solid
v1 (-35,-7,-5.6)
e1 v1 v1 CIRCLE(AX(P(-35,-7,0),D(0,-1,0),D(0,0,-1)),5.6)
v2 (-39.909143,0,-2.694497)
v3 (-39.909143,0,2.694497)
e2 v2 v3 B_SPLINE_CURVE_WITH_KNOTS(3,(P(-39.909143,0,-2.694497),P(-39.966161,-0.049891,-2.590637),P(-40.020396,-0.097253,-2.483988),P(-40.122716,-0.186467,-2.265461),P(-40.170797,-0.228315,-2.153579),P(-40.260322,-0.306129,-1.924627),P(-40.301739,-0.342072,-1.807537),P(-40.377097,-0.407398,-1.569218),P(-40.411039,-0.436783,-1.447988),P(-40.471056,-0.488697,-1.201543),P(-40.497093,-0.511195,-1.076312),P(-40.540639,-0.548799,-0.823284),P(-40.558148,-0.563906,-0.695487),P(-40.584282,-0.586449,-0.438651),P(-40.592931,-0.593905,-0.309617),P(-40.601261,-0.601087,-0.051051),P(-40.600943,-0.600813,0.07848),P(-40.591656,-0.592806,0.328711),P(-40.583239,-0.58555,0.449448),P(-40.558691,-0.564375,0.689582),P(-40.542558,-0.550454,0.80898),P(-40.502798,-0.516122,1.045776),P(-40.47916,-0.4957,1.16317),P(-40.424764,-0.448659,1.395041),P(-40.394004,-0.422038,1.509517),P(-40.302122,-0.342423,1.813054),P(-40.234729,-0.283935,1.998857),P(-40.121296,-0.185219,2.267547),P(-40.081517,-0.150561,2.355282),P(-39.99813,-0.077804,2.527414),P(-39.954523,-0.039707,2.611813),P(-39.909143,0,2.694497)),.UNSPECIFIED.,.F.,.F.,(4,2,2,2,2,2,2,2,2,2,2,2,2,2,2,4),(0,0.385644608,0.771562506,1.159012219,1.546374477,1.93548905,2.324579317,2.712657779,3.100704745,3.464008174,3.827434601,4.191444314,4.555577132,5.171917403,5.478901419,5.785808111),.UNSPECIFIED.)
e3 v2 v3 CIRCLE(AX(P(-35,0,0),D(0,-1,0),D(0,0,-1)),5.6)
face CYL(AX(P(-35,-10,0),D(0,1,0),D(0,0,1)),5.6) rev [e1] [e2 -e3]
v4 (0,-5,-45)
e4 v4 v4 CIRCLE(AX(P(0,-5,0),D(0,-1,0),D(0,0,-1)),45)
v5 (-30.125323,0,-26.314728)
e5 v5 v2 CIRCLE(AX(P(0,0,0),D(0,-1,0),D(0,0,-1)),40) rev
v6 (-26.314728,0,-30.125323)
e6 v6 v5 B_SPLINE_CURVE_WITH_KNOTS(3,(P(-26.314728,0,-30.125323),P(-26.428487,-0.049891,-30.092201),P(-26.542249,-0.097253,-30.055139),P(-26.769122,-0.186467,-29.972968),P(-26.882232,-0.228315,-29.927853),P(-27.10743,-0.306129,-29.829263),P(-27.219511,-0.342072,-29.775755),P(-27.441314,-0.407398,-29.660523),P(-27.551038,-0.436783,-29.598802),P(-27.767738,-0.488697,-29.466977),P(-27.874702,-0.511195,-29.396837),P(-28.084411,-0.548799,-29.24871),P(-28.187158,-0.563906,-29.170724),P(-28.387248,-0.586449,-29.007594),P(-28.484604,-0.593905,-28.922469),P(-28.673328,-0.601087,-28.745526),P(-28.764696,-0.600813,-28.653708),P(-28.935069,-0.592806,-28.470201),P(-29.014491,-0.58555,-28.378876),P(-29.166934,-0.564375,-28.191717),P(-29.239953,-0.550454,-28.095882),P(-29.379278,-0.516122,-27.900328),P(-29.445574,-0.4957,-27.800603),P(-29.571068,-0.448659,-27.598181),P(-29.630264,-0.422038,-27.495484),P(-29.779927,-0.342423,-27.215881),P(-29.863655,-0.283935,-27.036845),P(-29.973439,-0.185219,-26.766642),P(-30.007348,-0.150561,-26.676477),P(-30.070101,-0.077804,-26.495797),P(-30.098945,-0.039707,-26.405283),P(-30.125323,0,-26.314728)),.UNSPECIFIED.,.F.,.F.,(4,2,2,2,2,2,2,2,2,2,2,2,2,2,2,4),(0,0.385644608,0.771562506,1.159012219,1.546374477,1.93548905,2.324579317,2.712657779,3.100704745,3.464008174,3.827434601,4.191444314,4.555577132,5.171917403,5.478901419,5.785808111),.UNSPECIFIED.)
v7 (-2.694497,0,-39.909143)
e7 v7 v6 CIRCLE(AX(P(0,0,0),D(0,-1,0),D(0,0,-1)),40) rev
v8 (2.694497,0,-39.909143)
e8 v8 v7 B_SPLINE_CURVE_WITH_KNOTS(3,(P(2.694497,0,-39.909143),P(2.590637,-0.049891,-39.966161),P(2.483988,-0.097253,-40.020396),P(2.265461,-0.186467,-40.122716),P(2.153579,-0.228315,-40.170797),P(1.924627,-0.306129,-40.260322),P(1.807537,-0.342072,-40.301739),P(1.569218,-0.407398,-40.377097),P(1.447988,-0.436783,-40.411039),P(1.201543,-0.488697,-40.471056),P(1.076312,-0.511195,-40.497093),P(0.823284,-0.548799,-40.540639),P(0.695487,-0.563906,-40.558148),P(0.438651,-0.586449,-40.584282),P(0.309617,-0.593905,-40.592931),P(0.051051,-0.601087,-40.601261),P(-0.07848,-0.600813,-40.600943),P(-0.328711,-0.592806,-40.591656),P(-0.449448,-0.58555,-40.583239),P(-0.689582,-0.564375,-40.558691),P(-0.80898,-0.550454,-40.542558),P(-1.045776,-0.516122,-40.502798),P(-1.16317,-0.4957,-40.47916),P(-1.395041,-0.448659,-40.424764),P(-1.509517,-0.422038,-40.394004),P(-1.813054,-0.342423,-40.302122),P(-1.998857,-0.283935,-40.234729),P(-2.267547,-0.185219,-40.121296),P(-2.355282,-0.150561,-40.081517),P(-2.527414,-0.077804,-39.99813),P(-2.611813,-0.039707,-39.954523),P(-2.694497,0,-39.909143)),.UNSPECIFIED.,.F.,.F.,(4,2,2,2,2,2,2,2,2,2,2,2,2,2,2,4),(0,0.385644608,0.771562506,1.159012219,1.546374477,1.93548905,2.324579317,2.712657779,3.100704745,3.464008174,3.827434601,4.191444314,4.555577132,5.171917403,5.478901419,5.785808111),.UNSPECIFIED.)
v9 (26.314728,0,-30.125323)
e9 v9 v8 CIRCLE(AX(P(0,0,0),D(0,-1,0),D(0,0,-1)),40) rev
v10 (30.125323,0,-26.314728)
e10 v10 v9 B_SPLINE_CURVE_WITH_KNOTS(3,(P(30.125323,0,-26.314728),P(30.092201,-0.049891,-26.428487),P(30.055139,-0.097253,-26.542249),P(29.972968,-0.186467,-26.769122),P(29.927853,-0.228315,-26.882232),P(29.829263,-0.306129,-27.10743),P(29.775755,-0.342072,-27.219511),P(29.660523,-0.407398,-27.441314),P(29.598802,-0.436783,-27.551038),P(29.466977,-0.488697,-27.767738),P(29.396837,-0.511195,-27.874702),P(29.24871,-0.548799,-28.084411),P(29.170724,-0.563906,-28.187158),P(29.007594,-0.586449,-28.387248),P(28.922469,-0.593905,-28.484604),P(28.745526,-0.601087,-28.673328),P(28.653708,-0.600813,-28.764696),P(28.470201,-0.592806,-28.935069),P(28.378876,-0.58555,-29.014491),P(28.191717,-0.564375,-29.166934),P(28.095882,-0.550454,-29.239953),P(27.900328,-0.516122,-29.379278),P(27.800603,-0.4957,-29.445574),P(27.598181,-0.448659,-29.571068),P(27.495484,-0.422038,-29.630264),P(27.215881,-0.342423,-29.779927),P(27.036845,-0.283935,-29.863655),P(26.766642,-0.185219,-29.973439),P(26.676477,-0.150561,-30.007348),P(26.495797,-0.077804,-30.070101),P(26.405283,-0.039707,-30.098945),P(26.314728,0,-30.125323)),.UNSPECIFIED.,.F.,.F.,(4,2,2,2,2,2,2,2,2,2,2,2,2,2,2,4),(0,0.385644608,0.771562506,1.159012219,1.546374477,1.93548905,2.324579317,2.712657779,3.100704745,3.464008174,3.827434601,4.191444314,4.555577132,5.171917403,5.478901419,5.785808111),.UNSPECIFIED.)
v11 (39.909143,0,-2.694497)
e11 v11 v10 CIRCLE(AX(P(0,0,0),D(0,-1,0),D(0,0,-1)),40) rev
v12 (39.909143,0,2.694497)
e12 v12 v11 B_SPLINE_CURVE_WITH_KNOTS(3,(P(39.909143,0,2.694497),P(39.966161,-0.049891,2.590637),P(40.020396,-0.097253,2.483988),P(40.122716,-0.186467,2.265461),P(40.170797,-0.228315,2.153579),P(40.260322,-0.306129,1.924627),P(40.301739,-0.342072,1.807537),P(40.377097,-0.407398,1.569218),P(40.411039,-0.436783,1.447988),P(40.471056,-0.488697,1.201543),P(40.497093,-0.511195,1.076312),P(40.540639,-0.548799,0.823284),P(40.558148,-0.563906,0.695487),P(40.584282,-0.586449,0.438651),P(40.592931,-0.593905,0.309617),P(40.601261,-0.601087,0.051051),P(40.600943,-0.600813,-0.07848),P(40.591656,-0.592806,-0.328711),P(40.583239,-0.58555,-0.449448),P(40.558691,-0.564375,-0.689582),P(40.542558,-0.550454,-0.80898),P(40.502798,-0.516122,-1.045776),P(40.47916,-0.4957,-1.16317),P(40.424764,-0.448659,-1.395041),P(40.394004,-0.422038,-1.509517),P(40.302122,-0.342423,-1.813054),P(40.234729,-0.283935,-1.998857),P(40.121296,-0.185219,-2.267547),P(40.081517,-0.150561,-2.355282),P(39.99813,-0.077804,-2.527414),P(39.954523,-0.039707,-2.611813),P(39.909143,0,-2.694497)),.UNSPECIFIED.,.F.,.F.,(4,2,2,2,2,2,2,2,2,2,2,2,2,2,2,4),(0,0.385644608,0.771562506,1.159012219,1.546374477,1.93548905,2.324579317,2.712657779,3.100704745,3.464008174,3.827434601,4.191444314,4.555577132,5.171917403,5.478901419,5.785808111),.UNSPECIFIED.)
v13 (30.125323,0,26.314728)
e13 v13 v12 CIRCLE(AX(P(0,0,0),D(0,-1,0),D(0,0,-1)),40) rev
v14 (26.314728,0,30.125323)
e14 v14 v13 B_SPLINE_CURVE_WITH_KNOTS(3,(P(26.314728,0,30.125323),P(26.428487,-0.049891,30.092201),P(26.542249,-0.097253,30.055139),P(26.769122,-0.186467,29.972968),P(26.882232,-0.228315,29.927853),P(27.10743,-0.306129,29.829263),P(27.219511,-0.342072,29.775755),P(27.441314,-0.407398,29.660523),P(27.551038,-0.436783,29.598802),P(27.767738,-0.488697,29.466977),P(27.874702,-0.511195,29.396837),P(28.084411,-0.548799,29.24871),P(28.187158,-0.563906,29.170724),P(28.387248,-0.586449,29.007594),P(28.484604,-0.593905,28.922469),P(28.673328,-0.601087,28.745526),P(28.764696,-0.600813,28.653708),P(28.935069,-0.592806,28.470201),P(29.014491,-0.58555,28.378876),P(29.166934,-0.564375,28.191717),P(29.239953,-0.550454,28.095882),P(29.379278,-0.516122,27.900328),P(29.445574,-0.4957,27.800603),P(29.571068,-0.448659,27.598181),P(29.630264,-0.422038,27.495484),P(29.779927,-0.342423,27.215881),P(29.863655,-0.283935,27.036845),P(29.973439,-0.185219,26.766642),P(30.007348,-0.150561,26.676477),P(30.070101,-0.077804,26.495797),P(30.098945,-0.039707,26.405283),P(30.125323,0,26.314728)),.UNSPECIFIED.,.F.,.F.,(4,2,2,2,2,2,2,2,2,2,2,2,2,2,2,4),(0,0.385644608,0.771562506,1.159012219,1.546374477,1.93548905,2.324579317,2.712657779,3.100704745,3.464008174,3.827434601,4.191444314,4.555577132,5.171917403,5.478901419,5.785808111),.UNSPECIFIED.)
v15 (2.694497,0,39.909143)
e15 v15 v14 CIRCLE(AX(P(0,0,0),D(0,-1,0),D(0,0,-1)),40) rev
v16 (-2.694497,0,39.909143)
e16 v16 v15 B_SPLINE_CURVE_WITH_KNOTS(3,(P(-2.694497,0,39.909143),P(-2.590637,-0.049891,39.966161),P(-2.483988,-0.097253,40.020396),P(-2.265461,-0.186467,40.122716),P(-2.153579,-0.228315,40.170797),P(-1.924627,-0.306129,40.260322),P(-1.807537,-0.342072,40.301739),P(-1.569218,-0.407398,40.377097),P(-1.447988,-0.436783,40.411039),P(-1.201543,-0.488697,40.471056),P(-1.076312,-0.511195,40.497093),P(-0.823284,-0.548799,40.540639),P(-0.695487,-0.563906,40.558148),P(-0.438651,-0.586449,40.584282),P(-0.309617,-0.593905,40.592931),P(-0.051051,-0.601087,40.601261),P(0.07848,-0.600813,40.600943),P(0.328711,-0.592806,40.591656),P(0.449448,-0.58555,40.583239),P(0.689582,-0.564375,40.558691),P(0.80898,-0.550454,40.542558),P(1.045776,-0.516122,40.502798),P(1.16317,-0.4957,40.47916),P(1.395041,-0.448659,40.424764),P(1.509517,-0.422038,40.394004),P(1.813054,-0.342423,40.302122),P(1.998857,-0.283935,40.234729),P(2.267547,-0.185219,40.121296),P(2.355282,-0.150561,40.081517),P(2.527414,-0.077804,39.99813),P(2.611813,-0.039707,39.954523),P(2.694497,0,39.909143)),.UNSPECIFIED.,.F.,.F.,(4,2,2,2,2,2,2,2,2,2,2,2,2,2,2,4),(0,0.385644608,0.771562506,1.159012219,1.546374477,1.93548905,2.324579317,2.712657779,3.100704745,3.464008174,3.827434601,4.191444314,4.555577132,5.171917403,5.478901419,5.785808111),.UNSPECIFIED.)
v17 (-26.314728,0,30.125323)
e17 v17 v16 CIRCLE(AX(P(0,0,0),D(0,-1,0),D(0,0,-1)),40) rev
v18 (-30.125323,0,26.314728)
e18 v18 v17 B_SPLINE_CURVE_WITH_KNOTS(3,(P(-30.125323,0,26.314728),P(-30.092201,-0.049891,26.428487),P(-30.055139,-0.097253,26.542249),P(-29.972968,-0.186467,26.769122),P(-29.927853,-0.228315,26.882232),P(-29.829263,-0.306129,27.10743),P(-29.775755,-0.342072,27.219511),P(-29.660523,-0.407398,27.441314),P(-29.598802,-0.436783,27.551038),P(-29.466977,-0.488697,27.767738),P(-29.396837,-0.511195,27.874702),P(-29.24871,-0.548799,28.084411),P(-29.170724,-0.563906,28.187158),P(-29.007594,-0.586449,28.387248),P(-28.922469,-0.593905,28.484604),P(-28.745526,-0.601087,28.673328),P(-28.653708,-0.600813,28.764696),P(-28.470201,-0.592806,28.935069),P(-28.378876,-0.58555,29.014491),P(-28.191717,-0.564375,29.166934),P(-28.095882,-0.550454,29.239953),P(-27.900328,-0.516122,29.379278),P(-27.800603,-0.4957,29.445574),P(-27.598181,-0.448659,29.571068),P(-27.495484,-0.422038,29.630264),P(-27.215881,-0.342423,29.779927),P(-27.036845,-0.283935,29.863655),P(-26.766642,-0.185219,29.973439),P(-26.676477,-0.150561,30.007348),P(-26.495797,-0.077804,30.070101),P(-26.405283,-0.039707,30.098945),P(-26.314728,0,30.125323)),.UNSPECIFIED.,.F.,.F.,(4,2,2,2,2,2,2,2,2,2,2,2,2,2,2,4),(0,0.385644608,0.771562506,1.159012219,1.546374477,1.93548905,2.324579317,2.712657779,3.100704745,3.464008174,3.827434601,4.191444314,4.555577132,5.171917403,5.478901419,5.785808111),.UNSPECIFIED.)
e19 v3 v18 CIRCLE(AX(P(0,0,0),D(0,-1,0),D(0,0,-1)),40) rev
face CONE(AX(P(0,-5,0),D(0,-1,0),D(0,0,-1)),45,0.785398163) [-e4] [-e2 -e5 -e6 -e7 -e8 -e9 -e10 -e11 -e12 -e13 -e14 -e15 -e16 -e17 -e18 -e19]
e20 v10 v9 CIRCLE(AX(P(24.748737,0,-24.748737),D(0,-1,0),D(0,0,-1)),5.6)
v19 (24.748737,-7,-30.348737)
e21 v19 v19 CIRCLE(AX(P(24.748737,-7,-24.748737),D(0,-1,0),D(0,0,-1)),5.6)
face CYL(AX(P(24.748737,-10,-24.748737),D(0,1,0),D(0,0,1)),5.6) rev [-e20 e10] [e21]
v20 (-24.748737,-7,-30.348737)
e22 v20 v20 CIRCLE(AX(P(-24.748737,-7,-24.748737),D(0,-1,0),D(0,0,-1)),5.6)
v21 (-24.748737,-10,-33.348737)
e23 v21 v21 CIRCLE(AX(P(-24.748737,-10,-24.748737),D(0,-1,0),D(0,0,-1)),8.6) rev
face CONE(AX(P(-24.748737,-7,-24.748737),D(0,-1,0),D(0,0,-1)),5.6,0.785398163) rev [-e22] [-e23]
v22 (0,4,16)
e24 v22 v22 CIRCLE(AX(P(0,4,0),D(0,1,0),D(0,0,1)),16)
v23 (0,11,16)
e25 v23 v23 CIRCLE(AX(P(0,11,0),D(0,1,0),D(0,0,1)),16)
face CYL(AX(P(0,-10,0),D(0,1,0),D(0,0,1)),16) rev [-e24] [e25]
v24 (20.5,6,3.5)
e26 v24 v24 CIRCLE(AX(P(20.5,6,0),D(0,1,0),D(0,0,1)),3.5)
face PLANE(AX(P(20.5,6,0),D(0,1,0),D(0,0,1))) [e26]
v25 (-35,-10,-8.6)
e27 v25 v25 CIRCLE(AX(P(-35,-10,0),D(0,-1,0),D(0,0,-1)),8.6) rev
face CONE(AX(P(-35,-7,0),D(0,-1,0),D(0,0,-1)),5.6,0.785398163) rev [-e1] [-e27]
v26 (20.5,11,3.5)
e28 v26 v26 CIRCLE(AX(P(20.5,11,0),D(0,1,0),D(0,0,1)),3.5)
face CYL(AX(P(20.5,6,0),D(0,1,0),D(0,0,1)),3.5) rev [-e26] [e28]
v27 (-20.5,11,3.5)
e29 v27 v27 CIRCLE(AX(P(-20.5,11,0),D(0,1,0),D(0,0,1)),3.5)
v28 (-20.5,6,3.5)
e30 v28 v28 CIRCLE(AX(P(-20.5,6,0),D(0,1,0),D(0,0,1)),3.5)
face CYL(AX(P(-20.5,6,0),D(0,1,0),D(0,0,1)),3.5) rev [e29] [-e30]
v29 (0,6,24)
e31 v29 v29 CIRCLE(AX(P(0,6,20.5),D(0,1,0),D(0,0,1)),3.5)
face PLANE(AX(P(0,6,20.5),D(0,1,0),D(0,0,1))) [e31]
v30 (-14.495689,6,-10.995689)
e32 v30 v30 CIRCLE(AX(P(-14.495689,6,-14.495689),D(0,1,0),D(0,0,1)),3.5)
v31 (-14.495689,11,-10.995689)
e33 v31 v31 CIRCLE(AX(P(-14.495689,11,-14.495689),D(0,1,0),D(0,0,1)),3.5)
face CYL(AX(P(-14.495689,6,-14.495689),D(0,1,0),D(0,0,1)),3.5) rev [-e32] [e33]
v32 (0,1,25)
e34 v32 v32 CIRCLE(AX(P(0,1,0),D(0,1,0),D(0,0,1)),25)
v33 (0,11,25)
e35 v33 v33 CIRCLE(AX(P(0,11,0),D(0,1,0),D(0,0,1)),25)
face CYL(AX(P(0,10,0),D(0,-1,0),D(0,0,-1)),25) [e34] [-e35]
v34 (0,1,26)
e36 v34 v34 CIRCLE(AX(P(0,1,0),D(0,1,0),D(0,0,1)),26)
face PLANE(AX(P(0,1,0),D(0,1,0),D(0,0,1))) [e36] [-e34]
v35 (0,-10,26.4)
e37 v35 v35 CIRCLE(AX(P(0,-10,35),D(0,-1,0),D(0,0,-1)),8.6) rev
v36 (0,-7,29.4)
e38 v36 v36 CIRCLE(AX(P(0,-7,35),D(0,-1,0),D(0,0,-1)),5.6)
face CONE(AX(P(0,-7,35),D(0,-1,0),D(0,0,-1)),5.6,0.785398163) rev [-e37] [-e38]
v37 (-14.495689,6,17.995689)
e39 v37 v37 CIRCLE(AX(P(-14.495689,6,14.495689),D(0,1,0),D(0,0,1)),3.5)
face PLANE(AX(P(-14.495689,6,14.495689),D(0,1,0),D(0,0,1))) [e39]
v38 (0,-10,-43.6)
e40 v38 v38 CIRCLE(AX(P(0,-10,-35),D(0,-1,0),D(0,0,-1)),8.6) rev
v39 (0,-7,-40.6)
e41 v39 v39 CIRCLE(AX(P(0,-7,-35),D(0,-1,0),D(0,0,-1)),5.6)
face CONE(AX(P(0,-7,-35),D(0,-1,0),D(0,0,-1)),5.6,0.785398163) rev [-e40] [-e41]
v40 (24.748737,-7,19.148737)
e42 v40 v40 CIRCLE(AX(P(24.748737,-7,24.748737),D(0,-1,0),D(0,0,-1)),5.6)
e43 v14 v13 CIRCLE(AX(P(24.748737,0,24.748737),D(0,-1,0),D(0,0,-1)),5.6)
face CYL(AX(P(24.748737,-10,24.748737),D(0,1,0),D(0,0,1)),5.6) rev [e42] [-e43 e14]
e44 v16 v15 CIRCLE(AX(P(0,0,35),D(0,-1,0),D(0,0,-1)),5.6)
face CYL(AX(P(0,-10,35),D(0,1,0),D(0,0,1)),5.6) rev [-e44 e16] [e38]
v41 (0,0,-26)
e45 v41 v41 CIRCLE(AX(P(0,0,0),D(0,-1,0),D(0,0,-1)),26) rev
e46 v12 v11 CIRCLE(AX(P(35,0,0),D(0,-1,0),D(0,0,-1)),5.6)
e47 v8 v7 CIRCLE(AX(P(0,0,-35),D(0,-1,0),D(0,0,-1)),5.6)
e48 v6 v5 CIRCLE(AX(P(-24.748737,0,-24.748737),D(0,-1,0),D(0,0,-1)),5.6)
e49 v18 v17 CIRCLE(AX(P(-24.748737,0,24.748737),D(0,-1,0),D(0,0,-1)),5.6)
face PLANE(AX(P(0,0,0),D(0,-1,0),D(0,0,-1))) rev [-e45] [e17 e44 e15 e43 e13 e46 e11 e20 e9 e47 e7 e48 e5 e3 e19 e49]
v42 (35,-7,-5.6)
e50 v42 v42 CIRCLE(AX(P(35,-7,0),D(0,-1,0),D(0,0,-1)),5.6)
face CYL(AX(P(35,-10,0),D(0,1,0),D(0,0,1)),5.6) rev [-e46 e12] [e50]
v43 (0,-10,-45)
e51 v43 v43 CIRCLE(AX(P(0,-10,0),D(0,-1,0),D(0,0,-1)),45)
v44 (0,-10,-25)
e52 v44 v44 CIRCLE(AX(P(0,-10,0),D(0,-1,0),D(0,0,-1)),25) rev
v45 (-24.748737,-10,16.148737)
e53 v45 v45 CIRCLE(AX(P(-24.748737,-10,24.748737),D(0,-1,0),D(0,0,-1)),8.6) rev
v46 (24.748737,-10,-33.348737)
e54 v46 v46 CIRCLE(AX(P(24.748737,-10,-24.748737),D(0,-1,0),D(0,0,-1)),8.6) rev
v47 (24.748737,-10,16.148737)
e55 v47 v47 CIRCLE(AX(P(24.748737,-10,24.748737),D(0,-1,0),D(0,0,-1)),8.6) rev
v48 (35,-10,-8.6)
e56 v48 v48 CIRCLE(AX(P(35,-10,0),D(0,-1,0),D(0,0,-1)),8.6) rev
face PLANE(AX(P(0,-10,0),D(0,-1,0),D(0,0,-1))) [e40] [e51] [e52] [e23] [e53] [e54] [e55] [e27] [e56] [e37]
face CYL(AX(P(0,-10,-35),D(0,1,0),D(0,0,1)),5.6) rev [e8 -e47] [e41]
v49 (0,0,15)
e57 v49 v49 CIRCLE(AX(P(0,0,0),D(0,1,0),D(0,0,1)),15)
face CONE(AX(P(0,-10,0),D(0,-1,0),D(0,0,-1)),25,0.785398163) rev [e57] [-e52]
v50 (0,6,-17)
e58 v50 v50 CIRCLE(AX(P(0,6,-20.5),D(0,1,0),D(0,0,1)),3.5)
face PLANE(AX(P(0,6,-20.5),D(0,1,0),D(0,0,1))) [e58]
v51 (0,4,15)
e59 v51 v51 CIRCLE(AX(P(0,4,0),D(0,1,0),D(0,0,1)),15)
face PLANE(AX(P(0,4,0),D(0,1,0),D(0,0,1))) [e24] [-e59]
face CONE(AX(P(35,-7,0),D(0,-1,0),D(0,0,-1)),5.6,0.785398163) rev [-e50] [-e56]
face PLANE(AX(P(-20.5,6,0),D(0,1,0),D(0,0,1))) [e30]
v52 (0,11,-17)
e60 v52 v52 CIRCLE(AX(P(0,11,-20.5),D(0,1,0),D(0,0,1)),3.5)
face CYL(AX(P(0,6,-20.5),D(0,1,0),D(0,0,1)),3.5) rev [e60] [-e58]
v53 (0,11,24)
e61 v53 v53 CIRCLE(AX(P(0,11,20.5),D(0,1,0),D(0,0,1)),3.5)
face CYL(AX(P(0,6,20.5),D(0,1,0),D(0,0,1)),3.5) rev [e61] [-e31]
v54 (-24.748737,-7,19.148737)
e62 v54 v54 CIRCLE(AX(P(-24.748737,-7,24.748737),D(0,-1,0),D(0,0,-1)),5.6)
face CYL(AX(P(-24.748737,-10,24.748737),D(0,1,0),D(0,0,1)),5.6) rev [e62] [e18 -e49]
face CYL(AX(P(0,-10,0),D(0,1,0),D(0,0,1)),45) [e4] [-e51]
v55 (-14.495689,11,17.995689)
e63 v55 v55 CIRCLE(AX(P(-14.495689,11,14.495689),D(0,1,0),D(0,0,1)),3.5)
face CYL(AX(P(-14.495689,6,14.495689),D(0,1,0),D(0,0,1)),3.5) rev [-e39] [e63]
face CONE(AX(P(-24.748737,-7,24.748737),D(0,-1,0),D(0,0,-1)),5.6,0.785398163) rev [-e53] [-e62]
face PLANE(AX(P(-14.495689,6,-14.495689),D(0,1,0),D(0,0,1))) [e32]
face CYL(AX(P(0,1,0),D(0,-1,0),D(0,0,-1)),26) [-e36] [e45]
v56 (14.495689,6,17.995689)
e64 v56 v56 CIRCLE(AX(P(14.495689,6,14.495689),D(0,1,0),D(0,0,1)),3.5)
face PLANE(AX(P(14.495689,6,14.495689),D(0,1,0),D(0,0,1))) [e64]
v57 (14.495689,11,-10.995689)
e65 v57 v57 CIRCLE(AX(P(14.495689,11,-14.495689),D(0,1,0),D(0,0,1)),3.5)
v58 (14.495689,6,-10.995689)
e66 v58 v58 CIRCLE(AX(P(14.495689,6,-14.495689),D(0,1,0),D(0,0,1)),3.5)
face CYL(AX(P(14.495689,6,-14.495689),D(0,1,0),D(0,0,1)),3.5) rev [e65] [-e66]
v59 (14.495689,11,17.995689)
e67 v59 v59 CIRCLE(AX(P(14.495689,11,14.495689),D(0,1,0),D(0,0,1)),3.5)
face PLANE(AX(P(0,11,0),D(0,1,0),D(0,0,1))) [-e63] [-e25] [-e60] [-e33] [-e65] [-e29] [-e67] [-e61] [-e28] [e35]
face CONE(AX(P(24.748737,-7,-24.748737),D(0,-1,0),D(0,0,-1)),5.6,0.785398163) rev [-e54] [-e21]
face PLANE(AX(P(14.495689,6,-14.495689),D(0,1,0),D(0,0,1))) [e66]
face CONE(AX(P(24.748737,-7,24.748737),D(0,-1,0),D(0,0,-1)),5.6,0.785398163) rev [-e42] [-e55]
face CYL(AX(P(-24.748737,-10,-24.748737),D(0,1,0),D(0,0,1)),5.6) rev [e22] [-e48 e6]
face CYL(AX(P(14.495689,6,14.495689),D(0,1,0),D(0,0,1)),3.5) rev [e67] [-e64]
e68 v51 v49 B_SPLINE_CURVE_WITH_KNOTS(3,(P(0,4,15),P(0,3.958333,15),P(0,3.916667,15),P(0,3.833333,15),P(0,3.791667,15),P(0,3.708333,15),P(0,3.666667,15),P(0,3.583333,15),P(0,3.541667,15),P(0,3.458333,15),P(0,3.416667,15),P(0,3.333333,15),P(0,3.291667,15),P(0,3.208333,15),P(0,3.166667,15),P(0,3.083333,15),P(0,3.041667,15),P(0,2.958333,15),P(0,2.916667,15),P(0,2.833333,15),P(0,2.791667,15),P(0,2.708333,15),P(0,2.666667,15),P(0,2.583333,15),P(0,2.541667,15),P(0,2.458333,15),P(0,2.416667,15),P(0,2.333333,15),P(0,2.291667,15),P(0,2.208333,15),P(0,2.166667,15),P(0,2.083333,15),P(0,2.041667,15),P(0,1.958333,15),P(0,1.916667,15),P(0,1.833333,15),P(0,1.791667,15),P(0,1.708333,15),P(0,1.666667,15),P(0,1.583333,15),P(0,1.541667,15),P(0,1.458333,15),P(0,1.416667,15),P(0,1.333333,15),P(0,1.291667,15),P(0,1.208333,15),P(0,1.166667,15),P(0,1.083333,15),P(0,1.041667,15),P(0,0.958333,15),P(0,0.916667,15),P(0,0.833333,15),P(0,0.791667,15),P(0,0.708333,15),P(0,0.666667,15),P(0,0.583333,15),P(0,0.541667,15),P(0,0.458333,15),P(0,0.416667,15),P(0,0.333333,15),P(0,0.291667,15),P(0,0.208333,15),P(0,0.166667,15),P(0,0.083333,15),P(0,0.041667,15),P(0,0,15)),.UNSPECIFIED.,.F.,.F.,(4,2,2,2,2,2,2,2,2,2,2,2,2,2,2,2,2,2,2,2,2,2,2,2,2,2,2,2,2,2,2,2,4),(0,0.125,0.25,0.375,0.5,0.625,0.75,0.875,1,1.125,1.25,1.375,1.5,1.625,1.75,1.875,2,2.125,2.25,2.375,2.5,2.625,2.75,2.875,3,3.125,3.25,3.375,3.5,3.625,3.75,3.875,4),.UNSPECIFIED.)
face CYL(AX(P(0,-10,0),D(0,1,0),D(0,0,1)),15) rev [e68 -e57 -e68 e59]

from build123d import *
from build123d.topology import SkipClean

# Parameters (mm, degrees)
SKETCH1_R           = 25
SKETCH1_R_2         = 17.5
BOSS_EXTRUDE1_DEPTH = 10
BOSS_EXTRUDE2_START = 10
SKETCH2_R           = 45
SKETCH2_R_2         = 5.6
SKETCH2_R_3         = 17.5
BOSS_EXTRUDE2_DEPTH = 10
CHAMFER1_SIZE       = 5
BOSS_EXTRUDE4_START = -20
SKETCH4_R           = 17.5
SKETCH4_R_2         = 16
BOSS_EXTRUDE4_DEPTH = 20
BOSS_EXTRUDE5_START = -20
SKETCH5_R           = 16
SKETCH5_R_2         = 15
BOSS_EXTRUDE5_DEPTH = 13
CHAMFER3_SIZE       = 10
SKETCH7_R           = 25
SKETCH7_R_2         = 16
BOSS_EXTRUDE6_DEPTH = 1
SKETCH8_R           = 16
SKETCH8_R_2         = 15
BOSS_EXTRUDE7_DEPTH = 1
SKETCH9_R           = 26
BOSS_EXTRUDE8_DEPTH = 1
CUT_EXTRUDE1_START  = -18
SKETCH10_R          = 15
CUT_EXTRUDE1_DEPTH  = 18
CHAMFER4_SIZE       = 3
SKETCH11_R          = 3.5
CUT_EXTRUDE2_DEPTH  = 5


with BuildPart() as part:
    # Sketch1 → Boss-Extrude1 (new body)
    with BuildSketch(Plane(origin=(0, 0, 0), x_dir=(1, 0, 0), z_dir=(0, 1, 0))):
        with Locations(Location((0, 0, 0), (0, 0, 270))):
            Circle(SKETCH1_R)
        with Locations(Location((0, 0, 0), (0, 0, 270))):
            Circle(SKETCH1_R_2, mode=Mode.SUBTRACT)
    extrude(amount=BOSS_EXTRUDE1_DEPTH)

    # Sketch2 → Boss-Extrude2 (add)
    with SkipClean():  # the faces are left unmerged after this step: merging them gives an invalid solid
        with BuildSketch(Plane.XZ.offset(BOSS_EXTRUDE2_START)):
            with Locations(Location((0, 0, 0), (0, 0, 270))):
                Circle(SKETCH2_R)
            with Locations(Location((35, 0, 0), (0, 0, 270))):
                Circle(SKETCH2_R_2, mode=Mode.SUBTRACT)
            with Locations(Location((24.748737342, -24.748737342, 0), (0, 0, 270))):
                Circle(SKETCH2_R_2, mode=Mode.SUBTRACT)
            with Locations(Location((0, -35, 0), (0, 0, 270))):
                Circle(SKETCH2_R_2, mode=Mode.SUBTRACT)
            with Locations(Location((-24.748737342, -24.748737342, 0), (0, 0, 270))):
                Circle(SKETCH2_R_2, mode=Mode.SUBTRACT)
            with Locations(Location((-35, 0, 0), (0, 0, 270))):
                Circle(SKETCH2_R_2, mode=Mode.SUBTRACT)
            with Locations(Location((-24.748737342, 24.748737342, 0), (0, 0, 270))):
                Circle(SKETCH2_R_2, mode=Mode.SUBTRACT)
            with Locations(Location((0, 35, 0), (0, 0, 270))):
                Circle(SKETCH2_R_2, mode=Mode.SUBTRACT)
            with Locations(Location((24.748737342, 24.748737342, 0), (0, 0, 270))):
                Circle(SKETCH2_R_2, mode=Mode.SUBTRACT)
            with Locations(Location((0, 0, 0), (0, 0, 270))):
                Circle(SKETCH2_R_3, mode=Mode.SUBTRACT)
        extrude(amount=-BOSS_EXTRUDE2_DEPTH)

    # Chamfer1
    # the kernel refuses this chamfer: 5 mm, written as the material it takes off along each edge
    with BuildSketch(Plane(origin=(0, 0, 0), x_dir=(0, 0, -1), z_dir=(-1, 0, 0))) as chamfer1_piece_1:
        Polygon((45 - CHAMFER1_SIZE, 0), (45, CHAMFER1_SIZE), (45, 0), align=None)
    revolve(axis=Axis((0, 0, 0), (0, -1, 0)), mode=Mode.SUBTRACT)

    # Sketch4 → Boss-Extrude4 (add)
    with BuildSketch(Plane(origin=(0, 10, 0), x_dir=(1, 0, 0), z_dir=(0, 1, 0)).offset(BOSS_EXTRUDE4_START)):
        Circle(SKETCH4_R)
        with Locations(Location((0, 0, 0), (0, 0, 270))):
            Circle(SKETCH4_R_2, mode=Mode.SUBTRACT)
    extrude(amount=BOSS_EXTRUDE4_DEPTH)

    # Sketch5 → Boss-Extrude5 (add)
    with BuildSketch(Plane(origin=(0, 10, 0), x_dir=(1, 0, 0), z_dir=(0, 1, 0)).offset(BOSS_EXTRUDE5_START)):
        with Locations(Location((0, 0, 0), (0, 0, 270))):
            Circle(SKETCH5_R)
        with Locations(Location((0, 0, 0), (0, 0, 270))):
            Circle(SKETCH5_R_2, mode=Mode.SUBTRACT)
    extrude(amount=BOSS_EXTRUDE5_DEPTH)

    # Chamfer3
    chamfer3_edges = [part.edges().sort_by_distance(p)[0] for p in [
        (0, -10, -15),
    ]]
    chamfer(chamfer3_edges, length=CHAMFER3_SIZE)

    # Sketch7 → Boss-Extrude6 (add)
    with BuildSketch(Plane(origin=(0, 10, 0), x_dir=(1, 0, 0), z_dir=(0, 1, 0))):
        with Locations(Location((0, 0, 0), (0, 0, 270))):
            Circle(SKETCH7_R)
        with Locations(Location((0, 0, 0), (0, 0, 270))):
            Circle(SKETCH7_R_2, mode=Mode.SUBTRACT)
    extrude(amount=BOSS_EXTRUDE6_DEPTH)

    # Sketch8 → Boss-Extrude7 (add)
    with BuildSketch(Plane(origin=(0, 3, 0), x_dir=(1, 0, 0), z_dir=(0, 1, 0))):
        with Locations(Location((0, 0, 0), (0, 0, 270))):
            Circle(SKETCH8_R)
        with Locations(Location((0, 0, 0), (0, 0, 270))):
            Circle(SKETCH8_R_2, mode=Mode.SUBTRACT)
    extrude(amount=BOSS_EXTRUDE7_DEPTH)

    # Sketch9 → Boss-Extrude8 (add)
    with BuildSketch(Plane(origin=(0, 0, 0), x_dir=(1, 0, 0), z_dir=(0, 1, 0))):
        with Locations(Location((0, 0, 0), (0, 0, 90))):
            Circle(SKETCH9_R)
    extrude(amount=BOSS_EXTRUDE8_DEPTH)

    # Sketch10 → Cut-Extrude1 (cut)
    with BuildSketch(Plane(origin=(0, 1, 0), x_dir=(1, 0, 0), z_dir=(0, 1, 0)).offset(CUT_EXTRUDE1_START)):
        with Locations(Location((0, 0, 0), (0, 0, 270))):
            Circle(SKETCH10_R)
    extrude(amount=CUT_EXTRUDE1_DEPTH, mode=Mode.SUBTRACT)

    # Chamfer4
    chamfer4_edges = [part.edges().sort_by_distance(p)[0] for p in [
        (-35, -10, 5.6),
        (-24.748737342, -10, 30.348737342),
        (0, -10, 40.6),
        (24.748737342, -10, 30.348737342),
        (35, -10, 5.6),
        (24.748737342, -10, -19.148737342),
        (0, -10, -29.4),
        (-24.748737342, -10, -19.148737342),
    ]]
    chamfer(chamfer4_edges, length=CHAMFER4_SIZE)

    # Sketch11 → Cut-Extrude2 (cut)
    with BuildSketch(Plane(origin=(0, 11, 0), x_dir=(1, 0, 0), z_dir=(0, 1, 0))):
        with Locations(Location((-20.5, 0, 0), (0, 0, 270))):
            Circle(SKETCH11_R)
        with Locations(Location((-14.495689014, 14.495689014, 0), (0, 0, 270))):
            Circle(SKETCH11_R)
        with Locations(Location((0, 20.5, 0), (0, 0, 270))):
            Circle(SKETCH11_R)
        with Locations(Location((14.495689014, 14.495689014, 0), (0, 0, 270))):
            Circle(SKETCH11_R)
        with Locations(Location((20.5, 0, 0), (0, 0, 270))):
            Circle(SKETCH11_R)
        with Locations(Location((14.495689014, -14.495689014, 0), (0, 0, 270))):
            Circle(SKETCH11_R)
        with Locations(Location((0, -20.5, 0), (0, 0, 270))):
            Circle(SKETCH11_R)
        with Locations(Location((-14.495689014, -14.495689014, 0), (0, 0, 270))):
            Circle(SKETCH11_R)
    extrude(amount=-CUT_EXTRUDE2_DEPTH, mode=Mode.SUBTRACT)


solid = part.part
